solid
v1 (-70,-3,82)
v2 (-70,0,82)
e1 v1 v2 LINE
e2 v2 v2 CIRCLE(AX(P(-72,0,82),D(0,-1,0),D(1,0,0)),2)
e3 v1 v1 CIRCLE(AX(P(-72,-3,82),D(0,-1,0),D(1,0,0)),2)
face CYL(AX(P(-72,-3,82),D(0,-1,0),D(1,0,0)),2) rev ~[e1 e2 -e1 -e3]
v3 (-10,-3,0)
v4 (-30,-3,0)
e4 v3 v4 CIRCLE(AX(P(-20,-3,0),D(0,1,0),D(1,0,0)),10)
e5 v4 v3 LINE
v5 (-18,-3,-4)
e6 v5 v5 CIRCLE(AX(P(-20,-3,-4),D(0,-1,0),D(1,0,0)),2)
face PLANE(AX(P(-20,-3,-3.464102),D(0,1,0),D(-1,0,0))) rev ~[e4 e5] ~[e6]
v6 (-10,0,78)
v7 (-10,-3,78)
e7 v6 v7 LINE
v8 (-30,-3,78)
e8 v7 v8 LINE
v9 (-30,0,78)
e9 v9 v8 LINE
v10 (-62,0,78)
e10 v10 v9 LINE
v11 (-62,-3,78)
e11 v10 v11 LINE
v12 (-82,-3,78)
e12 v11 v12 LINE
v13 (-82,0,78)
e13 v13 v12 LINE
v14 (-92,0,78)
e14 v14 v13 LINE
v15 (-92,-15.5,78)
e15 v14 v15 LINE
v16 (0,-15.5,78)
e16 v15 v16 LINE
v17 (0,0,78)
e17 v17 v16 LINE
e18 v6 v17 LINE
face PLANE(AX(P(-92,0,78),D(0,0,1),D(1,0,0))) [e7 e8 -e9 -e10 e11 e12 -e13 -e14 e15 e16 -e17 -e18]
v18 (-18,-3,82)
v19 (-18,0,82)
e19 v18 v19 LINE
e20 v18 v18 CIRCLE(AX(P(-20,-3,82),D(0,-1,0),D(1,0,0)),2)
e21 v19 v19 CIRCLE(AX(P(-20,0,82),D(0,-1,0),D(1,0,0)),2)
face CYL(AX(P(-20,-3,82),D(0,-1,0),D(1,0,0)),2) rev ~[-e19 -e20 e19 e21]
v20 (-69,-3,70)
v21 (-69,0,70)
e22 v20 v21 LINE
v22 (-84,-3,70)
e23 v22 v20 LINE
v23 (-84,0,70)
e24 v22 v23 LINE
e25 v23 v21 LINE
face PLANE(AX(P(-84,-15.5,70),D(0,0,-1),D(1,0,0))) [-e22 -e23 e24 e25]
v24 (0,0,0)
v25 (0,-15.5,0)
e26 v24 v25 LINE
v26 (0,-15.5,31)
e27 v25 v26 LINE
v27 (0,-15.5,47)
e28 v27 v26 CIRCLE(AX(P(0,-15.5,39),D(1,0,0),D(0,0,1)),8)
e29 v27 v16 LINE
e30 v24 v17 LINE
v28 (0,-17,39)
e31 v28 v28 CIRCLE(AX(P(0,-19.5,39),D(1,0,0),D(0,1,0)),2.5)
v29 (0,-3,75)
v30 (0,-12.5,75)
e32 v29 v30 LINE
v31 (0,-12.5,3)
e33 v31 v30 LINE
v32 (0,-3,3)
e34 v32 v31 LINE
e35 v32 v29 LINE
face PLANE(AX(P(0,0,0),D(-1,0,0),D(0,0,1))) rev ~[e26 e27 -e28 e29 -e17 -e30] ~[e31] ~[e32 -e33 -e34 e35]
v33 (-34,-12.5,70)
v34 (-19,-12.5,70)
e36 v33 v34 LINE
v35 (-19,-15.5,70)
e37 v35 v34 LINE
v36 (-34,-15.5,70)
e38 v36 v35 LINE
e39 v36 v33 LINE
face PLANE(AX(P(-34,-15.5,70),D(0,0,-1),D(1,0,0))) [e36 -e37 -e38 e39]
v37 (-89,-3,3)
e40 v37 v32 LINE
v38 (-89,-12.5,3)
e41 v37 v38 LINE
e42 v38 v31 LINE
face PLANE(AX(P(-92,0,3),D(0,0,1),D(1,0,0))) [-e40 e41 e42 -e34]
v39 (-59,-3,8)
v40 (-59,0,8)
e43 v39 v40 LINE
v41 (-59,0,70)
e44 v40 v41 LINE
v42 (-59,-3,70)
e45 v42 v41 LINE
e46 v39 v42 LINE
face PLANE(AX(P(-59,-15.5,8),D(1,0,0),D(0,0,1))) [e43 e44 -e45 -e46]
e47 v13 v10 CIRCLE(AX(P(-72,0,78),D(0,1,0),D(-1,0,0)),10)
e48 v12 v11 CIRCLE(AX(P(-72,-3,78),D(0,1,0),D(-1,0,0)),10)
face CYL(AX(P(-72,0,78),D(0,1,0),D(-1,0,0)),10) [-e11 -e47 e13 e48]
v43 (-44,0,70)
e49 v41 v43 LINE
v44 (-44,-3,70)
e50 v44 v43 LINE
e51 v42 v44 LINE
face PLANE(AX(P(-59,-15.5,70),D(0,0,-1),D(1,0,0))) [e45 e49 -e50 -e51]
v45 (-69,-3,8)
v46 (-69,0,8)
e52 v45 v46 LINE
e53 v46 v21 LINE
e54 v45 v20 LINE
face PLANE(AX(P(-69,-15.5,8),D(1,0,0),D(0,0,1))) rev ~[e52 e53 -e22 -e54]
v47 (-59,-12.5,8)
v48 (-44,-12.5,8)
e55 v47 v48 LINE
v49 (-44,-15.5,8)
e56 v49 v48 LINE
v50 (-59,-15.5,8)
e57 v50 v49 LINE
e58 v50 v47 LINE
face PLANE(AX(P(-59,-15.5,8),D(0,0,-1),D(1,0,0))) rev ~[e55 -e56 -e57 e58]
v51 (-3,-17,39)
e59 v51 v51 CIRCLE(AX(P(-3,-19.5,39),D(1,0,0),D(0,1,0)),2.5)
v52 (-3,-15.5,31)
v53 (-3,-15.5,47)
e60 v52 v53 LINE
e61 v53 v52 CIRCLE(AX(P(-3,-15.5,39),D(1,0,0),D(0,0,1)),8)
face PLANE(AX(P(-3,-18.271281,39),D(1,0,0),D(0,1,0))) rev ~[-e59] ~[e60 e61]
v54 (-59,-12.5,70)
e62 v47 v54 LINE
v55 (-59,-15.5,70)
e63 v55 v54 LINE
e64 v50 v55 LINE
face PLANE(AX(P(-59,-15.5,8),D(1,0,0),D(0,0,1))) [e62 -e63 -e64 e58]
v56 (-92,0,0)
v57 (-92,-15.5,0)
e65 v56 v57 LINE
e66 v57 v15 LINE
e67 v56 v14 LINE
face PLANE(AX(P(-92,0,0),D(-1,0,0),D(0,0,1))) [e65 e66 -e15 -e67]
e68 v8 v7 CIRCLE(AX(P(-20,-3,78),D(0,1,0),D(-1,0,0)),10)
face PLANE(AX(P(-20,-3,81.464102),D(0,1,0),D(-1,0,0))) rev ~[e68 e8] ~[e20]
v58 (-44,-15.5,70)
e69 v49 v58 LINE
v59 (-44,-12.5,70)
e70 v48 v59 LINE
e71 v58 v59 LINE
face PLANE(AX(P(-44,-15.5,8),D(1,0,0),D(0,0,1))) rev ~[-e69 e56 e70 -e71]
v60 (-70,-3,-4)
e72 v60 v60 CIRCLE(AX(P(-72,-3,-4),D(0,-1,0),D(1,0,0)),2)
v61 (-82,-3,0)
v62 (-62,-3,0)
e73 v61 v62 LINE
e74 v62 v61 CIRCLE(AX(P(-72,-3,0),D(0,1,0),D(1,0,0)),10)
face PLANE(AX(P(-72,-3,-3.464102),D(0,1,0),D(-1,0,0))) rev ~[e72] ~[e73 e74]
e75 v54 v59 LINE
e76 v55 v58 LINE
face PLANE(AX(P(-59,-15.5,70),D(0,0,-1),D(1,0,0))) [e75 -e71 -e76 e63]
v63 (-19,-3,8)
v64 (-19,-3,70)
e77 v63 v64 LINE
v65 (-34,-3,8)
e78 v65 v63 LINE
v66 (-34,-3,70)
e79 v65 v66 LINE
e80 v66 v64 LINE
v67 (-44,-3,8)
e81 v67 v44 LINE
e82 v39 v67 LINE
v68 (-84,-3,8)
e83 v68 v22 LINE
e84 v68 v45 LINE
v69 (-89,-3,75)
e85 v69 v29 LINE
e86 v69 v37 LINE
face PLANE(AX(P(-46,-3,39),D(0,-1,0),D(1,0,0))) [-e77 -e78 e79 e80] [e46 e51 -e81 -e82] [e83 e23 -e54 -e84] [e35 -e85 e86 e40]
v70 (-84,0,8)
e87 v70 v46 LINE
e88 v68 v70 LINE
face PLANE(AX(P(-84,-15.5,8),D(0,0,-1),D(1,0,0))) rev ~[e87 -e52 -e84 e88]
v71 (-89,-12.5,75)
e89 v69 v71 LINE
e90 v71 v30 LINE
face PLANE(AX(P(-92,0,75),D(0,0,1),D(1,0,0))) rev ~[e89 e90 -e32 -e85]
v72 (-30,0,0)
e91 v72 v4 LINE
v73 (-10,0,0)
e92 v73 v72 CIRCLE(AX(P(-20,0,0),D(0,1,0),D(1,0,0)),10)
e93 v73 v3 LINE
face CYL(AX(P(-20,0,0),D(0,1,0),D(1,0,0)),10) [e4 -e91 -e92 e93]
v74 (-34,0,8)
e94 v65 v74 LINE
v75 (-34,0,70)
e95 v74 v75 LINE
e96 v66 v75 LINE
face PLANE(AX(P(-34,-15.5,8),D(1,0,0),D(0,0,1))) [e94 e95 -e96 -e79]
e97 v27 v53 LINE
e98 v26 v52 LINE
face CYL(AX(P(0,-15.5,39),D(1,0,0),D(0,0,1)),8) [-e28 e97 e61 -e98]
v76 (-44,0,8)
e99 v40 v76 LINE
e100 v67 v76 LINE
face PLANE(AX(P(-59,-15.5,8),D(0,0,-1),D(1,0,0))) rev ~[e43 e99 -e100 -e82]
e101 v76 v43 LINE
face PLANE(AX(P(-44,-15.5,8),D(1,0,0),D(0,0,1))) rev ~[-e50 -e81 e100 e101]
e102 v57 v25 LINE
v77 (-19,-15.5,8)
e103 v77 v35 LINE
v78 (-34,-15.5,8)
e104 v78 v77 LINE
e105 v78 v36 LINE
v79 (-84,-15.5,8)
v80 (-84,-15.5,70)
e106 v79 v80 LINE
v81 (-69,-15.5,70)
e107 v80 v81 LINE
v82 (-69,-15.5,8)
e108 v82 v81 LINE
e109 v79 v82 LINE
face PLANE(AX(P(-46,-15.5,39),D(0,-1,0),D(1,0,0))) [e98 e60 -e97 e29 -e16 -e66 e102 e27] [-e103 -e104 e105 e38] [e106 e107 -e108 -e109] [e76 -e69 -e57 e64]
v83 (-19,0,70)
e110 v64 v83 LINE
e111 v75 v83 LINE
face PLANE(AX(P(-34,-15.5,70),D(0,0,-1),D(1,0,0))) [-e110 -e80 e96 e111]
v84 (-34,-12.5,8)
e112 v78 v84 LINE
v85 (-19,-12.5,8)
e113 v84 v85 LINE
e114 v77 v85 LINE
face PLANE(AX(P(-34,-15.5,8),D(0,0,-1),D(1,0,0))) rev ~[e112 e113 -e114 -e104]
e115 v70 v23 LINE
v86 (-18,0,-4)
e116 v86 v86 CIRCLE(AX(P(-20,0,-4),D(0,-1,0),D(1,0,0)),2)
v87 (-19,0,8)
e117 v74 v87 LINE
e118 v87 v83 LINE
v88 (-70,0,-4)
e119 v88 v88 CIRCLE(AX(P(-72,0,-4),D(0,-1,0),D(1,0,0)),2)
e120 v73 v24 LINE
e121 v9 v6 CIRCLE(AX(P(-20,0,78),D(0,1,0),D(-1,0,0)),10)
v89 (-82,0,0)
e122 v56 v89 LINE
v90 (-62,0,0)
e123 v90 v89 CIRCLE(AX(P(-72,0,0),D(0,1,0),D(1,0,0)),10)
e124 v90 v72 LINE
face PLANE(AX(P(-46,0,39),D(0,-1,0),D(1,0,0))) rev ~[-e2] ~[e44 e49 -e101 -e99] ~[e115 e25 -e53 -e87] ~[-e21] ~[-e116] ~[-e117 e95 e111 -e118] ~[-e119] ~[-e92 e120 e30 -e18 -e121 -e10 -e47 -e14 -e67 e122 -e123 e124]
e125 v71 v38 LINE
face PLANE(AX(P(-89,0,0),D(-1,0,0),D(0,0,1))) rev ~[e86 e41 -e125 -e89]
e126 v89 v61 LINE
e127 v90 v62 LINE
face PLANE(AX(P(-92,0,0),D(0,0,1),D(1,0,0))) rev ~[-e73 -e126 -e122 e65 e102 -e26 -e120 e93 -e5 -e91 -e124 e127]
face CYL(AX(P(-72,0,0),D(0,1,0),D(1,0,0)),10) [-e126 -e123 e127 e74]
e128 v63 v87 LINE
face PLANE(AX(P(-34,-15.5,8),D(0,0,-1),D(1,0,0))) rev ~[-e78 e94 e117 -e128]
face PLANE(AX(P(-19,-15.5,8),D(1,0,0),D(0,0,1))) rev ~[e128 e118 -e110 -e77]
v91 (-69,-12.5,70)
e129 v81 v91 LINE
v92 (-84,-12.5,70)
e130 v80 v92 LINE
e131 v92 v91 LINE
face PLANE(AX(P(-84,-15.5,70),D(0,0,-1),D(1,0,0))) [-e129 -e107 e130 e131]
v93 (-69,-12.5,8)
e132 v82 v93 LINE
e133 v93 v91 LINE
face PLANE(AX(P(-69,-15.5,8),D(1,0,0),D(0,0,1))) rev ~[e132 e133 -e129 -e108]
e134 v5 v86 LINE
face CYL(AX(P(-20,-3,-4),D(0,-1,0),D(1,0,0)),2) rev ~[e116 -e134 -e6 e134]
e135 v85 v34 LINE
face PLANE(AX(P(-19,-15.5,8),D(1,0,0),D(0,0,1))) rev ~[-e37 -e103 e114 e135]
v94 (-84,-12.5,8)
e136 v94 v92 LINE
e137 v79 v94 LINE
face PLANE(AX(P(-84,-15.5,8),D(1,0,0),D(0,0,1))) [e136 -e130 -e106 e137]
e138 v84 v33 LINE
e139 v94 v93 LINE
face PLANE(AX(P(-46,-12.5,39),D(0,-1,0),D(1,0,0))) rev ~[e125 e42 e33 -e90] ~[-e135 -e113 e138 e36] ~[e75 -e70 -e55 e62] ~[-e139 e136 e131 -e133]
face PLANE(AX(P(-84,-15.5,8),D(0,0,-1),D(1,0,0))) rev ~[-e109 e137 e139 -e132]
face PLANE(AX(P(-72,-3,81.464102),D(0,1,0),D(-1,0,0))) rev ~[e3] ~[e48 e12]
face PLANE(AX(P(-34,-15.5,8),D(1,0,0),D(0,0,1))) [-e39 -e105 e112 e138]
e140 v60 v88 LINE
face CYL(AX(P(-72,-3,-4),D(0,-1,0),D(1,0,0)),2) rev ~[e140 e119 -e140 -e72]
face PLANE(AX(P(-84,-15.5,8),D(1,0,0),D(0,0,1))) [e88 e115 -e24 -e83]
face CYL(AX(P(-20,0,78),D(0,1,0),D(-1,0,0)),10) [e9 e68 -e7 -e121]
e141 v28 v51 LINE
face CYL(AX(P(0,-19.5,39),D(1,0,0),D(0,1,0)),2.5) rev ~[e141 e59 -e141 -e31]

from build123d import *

# Parameters (mm, degrees)
F0_W      = 92
F0_H      = 78
F1_DEPTH  = 15.5
F2_T      = -3
F4_DEPTH  = 3
F5_R      = 2
F6_DEPTH  = 25
F7_W      = 15
F7_H      = 62
F8_DEPTH  = 25
F10_DEPTH = 3
F11_R     = 2.5
F12_DEPTH = 5


# Not quite as in the source:
# - a feature names something its author has since deleted; it is built from what else it names


with BuildPart() as f1:
    # F0 (on Front) → F1 (new body)
    with BuildSketch(Plane.XZ):
        with Locations((-46, 39)):
            Rectangle(F0_W, F0_H)
    extrude(amount=F1_DEPTH)

    # F2
    f2_openings = [f1.faces().sort_by_distance(p)[0] for p in [
        (0, -7.75, 39),
    ]]
    offset(amount=F2_T, openings=f2_openings)

    # F3 (on face) → F4 (join)
    with BuildSketch(Plane(origin=(0, 0, 0), x_dir=(-1, 0, 0), z_dir=(0, 1, 0))):
        with BuildLine():
            Line((62, 78), (82, 78))
            ThreePointArc((82, 78), (72, 88), (62, 78))
        make_face()
        with BuildLine():
            ThreePointArc((62, 0), (72, -10), (82, 0))
            Line((82, 0), (62, 0))
        make_face()
        with BuildLine():
            Line((10, 78), (30, 78))
            ThreePointArc((30, 78), (20, 88), (10, 78))
        make_face()
        with BuildLine():
            ThreePointArc((10, 0), (20, -10), (30, 0))
            Line((30, 0), (10, 0))
        make_face()
    extrude(amount=-F4_DEPTH)

    # F5 (on face) → F6 (cut)
    with BuildSketch(Plane.XZ.offset(3)):
        with Locations((-72, 82)):
            Circle(F5_R)
        with Locations((-72, -4)):
            Circle(F5_R)
        with Locations((-20, 82)):
            Circle(F5_R)
        with Locations((-20, -4)):
            Circle(F5_R)
    extrude(amount=-F6_DEPTH, mode=Mode.SUBTRACT)

    # F7 (on face) → F8 (cut)
    with BuildSketch(Plane.XZ.offset(15.5)):
        with Locations((-76.5, 39)):
            Rectangle(F7_W, F7_H)
        with Locations((-51.5, 39)):
            Rectangle(F7_W, F7_H)
        with Locations((-26.5, 39)):
            Rectangle(F7_W, F7_H)
    extrude(amount=-F8_DEPTH, mode=Mode.SUBTRACT)

    # F9 (on face) → F10 (join)
    with BuildSketch(Plane.YZ):
        with BuildLine():
            Line((-15.5, 31), (-15.5, 47))
            ThreePointArc((-15.5, 47), (-23.5, 39), (-15.5, 31))
        make_face()
    extrude(amount=-F10_DEPTH)

    # F11 (on face) → F12 (cut)
    with BuildSketch(Plane.YZ):
        with Locations((-19.5, 39)):
            Circle(F11_R)
    extrude(amount=-F12_DEPTH, mode=Mode.SUBTRACT)


solid = f1.part
